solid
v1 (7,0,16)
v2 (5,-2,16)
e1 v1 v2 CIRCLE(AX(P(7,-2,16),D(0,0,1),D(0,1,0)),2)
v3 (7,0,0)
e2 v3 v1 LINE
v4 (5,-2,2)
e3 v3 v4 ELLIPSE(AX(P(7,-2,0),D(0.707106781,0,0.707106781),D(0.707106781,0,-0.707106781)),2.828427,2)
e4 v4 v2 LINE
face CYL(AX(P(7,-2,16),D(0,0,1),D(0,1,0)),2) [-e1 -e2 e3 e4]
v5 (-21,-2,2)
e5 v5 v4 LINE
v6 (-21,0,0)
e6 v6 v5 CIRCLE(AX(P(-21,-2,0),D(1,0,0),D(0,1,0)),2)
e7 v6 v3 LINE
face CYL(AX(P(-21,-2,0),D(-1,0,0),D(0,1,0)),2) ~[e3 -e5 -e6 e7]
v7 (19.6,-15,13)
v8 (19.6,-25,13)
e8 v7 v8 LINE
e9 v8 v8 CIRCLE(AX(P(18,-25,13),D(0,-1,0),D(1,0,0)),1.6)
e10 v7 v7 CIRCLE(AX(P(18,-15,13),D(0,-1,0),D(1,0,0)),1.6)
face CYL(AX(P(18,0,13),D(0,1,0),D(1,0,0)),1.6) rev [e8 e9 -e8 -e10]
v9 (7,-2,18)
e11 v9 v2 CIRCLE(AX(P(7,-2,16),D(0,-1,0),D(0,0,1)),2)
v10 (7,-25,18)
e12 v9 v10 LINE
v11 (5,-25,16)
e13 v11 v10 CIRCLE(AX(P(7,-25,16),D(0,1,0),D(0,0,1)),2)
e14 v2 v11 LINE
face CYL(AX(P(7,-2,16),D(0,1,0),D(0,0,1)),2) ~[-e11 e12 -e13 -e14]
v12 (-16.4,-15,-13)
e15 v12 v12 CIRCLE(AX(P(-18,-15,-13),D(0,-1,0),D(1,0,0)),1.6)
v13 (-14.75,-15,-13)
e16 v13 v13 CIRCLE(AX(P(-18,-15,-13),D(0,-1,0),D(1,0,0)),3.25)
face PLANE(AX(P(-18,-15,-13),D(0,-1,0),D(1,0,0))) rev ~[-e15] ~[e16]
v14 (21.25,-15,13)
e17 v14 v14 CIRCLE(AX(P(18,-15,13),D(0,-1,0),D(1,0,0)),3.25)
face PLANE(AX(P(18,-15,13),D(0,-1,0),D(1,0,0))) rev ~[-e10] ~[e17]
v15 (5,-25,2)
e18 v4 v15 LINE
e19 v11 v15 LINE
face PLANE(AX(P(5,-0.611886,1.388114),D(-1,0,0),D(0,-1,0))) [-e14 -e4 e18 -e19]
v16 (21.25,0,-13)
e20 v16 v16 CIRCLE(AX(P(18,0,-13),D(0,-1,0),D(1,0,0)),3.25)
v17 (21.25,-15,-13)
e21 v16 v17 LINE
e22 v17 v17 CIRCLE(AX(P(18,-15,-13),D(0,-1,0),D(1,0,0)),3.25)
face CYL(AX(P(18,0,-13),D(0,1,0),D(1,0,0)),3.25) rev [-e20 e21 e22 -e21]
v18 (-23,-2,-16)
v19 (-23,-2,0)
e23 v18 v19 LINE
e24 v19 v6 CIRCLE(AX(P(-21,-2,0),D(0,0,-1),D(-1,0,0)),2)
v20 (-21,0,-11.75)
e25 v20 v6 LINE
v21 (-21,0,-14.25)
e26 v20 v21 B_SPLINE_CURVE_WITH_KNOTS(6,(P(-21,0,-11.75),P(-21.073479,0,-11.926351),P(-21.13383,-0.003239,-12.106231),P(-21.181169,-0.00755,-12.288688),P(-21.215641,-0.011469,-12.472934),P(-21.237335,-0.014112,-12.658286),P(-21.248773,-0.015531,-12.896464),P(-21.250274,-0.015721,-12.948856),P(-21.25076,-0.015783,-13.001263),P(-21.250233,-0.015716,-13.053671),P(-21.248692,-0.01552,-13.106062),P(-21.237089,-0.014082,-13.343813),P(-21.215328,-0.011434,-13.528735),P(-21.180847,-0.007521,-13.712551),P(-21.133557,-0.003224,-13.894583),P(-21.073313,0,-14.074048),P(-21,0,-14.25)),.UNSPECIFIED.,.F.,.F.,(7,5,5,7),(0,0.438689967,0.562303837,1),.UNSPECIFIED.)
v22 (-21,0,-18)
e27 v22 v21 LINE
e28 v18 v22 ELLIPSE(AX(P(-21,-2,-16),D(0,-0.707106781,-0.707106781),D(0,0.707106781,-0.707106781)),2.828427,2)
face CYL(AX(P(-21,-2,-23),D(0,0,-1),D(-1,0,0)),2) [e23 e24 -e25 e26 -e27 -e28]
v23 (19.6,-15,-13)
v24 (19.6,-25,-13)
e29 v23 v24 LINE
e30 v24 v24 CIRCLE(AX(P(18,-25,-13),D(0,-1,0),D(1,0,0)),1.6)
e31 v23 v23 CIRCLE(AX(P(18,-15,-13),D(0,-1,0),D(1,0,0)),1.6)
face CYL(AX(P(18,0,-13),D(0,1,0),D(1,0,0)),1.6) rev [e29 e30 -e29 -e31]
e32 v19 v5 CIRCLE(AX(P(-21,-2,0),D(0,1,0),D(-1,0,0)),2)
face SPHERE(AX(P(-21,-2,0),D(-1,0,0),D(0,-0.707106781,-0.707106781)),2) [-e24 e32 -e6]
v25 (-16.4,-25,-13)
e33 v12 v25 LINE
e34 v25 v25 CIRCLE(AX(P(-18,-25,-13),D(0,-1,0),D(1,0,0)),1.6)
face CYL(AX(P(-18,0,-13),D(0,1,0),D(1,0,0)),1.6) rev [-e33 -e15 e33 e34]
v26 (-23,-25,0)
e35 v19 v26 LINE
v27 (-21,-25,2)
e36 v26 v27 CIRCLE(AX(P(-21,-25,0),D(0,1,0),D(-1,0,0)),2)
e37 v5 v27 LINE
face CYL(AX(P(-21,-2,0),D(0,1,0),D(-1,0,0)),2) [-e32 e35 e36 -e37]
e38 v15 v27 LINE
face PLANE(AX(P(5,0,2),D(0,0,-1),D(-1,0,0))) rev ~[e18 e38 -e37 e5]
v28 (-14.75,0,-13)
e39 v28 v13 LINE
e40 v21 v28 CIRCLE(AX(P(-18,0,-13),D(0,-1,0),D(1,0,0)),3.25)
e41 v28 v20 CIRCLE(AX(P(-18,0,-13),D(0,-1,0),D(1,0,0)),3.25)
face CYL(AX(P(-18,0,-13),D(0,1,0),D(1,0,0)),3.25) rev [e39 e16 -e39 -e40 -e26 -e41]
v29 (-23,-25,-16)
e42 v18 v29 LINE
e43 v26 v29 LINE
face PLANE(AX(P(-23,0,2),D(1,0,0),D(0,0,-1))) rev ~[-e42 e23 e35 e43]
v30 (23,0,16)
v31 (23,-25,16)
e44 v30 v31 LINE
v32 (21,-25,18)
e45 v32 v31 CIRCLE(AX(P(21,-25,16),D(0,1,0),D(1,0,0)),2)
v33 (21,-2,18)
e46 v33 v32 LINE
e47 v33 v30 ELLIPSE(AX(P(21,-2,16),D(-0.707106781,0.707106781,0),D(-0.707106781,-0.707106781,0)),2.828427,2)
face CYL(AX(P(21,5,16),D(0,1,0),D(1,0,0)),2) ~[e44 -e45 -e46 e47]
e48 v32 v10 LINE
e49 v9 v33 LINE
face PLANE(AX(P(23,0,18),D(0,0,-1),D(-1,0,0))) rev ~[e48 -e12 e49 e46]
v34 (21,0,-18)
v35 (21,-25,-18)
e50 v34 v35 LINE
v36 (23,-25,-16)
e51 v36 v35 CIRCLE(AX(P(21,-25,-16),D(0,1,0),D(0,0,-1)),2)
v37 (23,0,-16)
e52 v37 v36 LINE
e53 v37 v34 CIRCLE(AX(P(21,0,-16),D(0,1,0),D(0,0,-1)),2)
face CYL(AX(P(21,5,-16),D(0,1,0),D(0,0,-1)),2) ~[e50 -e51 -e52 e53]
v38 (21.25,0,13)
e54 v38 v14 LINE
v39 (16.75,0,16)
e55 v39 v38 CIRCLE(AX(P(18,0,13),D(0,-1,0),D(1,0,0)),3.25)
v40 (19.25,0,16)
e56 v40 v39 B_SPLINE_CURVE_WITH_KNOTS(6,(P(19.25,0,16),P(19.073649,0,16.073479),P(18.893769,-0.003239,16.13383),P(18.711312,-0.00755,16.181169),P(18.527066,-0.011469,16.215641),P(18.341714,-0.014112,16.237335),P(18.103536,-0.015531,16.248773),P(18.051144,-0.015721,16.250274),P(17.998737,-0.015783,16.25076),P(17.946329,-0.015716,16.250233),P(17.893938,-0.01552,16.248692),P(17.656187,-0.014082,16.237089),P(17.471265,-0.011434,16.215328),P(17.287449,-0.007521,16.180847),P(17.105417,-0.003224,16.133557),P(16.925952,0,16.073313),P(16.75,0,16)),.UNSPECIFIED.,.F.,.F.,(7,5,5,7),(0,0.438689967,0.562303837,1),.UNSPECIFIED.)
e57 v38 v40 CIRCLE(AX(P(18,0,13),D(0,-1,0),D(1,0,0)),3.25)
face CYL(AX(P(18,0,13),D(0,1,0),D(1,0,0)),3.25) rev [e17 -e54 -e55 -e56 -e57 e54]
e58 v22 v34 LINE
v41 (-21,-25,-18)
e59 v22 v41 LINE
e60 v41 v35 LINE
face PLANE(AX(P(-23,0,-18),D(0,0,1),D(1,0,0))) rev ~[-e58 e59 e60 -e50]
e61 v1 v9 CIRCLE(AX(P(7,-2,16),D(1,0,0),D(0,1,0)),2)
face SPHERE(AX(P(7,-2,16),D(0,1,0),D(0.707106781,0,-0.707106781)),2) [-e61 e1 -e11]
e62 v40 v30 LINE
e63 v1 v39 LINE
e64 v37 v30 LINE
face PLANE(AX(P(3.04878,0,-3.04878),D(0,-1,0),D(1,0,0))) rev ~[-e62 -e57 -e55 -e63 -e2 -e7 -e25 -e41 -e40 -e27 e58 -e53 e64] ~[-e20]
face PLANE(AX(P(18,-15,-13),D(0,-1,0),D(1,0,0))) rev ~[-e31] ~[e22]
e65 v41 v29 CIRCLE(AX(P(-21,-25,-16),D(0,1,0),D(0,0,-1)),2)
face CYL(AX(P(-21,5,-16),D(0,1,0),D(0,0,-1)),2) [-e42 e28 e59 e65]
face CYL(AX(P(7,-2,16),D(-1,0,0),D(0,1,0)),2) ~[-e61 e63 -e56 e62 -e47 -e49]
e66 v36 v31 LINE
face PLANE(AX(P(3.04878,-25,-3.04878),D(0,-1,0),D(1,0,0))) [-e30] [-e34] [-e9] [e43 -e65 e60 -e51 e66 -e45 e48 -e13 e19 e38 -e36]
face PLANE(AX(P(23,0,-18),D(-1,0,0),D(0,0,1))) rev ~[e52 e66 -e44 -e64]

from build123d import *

# Parameters (mm, degrees)
F0_R         = 3.25
F0_R_2       = 1.6
F0_W         = 26
F0_H         = 2
F1_DEPTH     = 25
F2_DEPTH     = 15
F3_T1_DEPTH  = 23
F3_T3_DEPTH  = 21
F3_T5_DEPTH  = 28
F3_T7_DEPTH  = 35
F3_T9_DEPTH  = 26
F3_T11_DEPTH = 14
F3_S15_W     = 2
F3_S15_H     = 2
F3_T16_DEPTH = 2
F3_S21_W     = 2
F3_S21_H     = 2
F3_T22_DEPTH = 2
F3_T29_DEPTH = 31
F3_T33_DEPTH = 19


# Not quite as in the source:
# - a fillet or chamfer that OpenCascade refuses, or shapes differently, is made with other operations: its cross-section is extruded or revolved along the edge and cut away or added


with BuildPart() as f1:
    # F0 (on Front) → F1 (new body)
    with BuildSketch(Plane.XZ):
        Polygon((-23, 0), (-23, -18), (23, -18), (23, 18), (5, 18), (5, 2), (3, 2), (3, 0), align=None)
        with Locations((-18, -13)):
            Circle(F0_R, mode=Mode.SUBTRACT)
        with Locations((18, -13)):
            Circle(F0_R, mode=Mode.SUBTRACT)
        with Locations((18, 13)):
            Circle(F0_R, mode=Mode.SUBTRACT)
        with Locations((18, 13)):
            Circle(F0_R)
        with Locations((18, 13)):
            Circle(F0_R_2, mode=Mode.SUBTRACT)
        with Locations((18, -13)):
            Circle(F0_R)
        with Locations((18, -13)):
            Circle(F0_R_2, mode=Mode.SUBTRACT)
        with Locations((-18, -13)):
            Circle(F0_R)
        with Locations((-18, -13)):
            Circle(F0_R_2, mode=Mode.SUBTRACT)
        with Locations((-10, 1)):
            Rectangle(F0_W, F0_H)
    extrude(amount=F1_DEPTH)

    # F0 (on Front) → F2 (cut)
    with BuildSketch(Plane.XZ):
        with Locations((18, -13)):
            Circle(F0_R)
        with Locations((18, -13)):
            Circle(F0_R_2, mode=Mode.SUBTRACT)
        with Locations((-18, -13)):
            Circle(F0_R)
        with Locations((-18, -13)):
            Circle(F0_R_2, mode=Mode.SUBTRACT)
        with Locations((18, 13)):
            Circle(F0_R)
        with Locations((18, 13)):
            Circle(F0_R_2, mode=Mode.SUBTRACT)
    extrude(amount=F2_DEPTH, mode=Mode.SUBTRACT)

    # F3: fillet of radius 2 on 9 edges, made by hand

    # F3_s2 → F3_t1 (cut)
    with BuildSketch(Plane.XY.offset(-23)):
        with BuildLine():
            ThreePointArc((-23, -2), (-22.4142135624, -0.5857864376), (-21, 0))
            Line((-21, 0), (-23, 0))
            Line((-23, 0), (-23, -2))
        make_face()
    extrude(amount=F3_T1_DEPTH, mode=Mode.SUBTRACT)

    # F3_s4 → F3_t3 (cut)
    with BuildSketch(Plane.YZ.offset(7)):
        with BuildLine():
            ThreePointArc((0, 16), (-0.5857864376, 17.4142135624), (-2, 18))
            Line((-2, 18), (0, 18))
            Line((0, 18), (0, 16))
        make_face()
    extrude(amount=F3_T3_DEPTH, mode=Mode.SUBTRACT)

    # F3_s6 → F3_t5 (cut)
    with BuildSketch(Plane.XZ.offset(2)):
        with BuildLine():
            ThreePointArc((-23, 0), (-22.4142135624, 1.4142135624), (-21, 2))
            Line((-21, 2), (-23, 2))
            Line((-23, 2), (-23, 0))
        make_face()
        with BuildLine():
            ThreePointArc((7, 18), (5.5857864376, 17.4142135624), (5, 16))
            Line((5, 16), (5, 18))
            Line((5, 18), (7, 18))
        make_face()
    extrude(amount=F3_T5_DEPTH, mode=Mode.SUBTRACT)

    # F3_s8 → F3_t7 (cut)
    with BuildSketch(Plane.XZ.offset(-5)):
        with BuildLine():
            ThreePointArc((-21, -18), (-22.4142135624, -17.4142135624), (-23, -16))
            Line((-23, -16), (-23, -18))
            Line((-23, -18), (-21, -18))
        make_face()
        with BuildLine():
            ThreePointArc((21, -18), (22.4142135624, -17.4142135624), (23, -16))
            Line((23, -16), (23, -18))
            Line((23, -18), (21, -18))
        make_face()
        with BuildLine():
            ThreePointArc((23, 16), (22.4142135624, 17.4142135624), (21, 18))
            Line((21, 18), (23, 18))
            Line((23, 18), (23, 16))
        make_face()
    extrude(amount=F3_T7_DEPTH, mode=Mode.SUBTRACT)

    # F3_s10 → F3_t9 (cut)
    with BuildSketch(Plane.YZ.offset(-21)):
        with BuildLine():
            ThreePointArc((0, 0), (-0.5857864376, 1.4142135624), (-2, 2))
            Line((-2, 2), (0, 2))
            Line((0, 2), (0, 0))
        make_face()
    extrude(amount=F3_T9_DEPTH, mode=Mode.SUBTRACT)

    # F3_s12 → F3_t11 (cut)
    with BuildSketch(Plane.XY.offset(2)):
        with BuildLine():
            ThreePointArc((7, 0), (5.5857864376, -0.5857864376), (5, -2))
            Line((5, -2), (5, 0))
            Line((5, 0), (7, 0))
        make_face()
    extrude(amount=F3_T11_DEPTH, mode=Mode.SUBTRACT)


with BuildPart() as f3_tool14:
    # F3_s15 → F3_t16 (new body)
    with BuildSketch(Plane.YZ.offset(-21)):
        with Locations((-1, 1)):
            Rectangle(F3_S15_W, F3_S15_H)
    extrude(amount=-F3_T16_DEPTH)

    # F3_s17 → F3_t18 (revolve, cut)
    with BuildSketch(Plane(origin=(-21, -2, 0), x_dir=(0, -0.7071067812, -0.7071067812), z_dir=(0, 0.7071067812, -0.7071067812))):
        with BuildLine():
            ThreePointArc((0, -2), (2, 0), (0, 2))
            Line((0, 2), (0, -2))
        make_face()
    revolve(axis=Axis((-21, -2, 0), (-1, 0, 0)), mode=Mode.SUBTRACT)


with BuildPart() as f1_1:
    add(f1.part)

    # F3_t13: cut F3_tool14
    add(f3_tool14.part, mode=Mode.SUBTRACT)


with BuildPart() as f3_tool20:
    # F3_s21 → F3_t22 (new body)
    with BuildSketch(Plane.XZ.offset(2)):
        with Locations((6, 17)):
            Rectangle(F3_S21_W, F3_S21_H)
    extrude(amount=-F3_T22_DEPTH)

    # F3_s23 → F3_t24 (revolve, cut)
    with BuildSketch(Plane(origin=(7, -2, 16), x_dir=(0.7071067812, 0, -0.7071067812), z_dir=(0.7071067812, 0, 0.7071067812))):
        with BuildLine():
            ThreePointArc((0, -2), (2, 0), (0, 2))
            Line((0, 2), (0, -2))
        make_face()
    revolve(axis=Axis((7, -2, 16), (0, 1, 0)), mode=Mode.SUBTRACT)


with BuildPart() as f1_2:
    add(f1_1.part)

    # F3_t19: cut F3_tool20
    add(f3_tool20.part, mode=Mode.SUBTRACT)


with BuildPart() as f3_tool27:
    # F3_s28 → F3_t29 (new body)
    with BuildSketch(Plane.YZ.offset(10)):
        with BuildLine():
            ThreePointArc((0, 0), (-0.5857864376, 1.4142135624), (-2, 2))
            Line((-2, 2), (0, 2))
            Line((0, 2), (0, 0))
        make_face()
    extrude(amount=-F3_T29_DEPTH)

    split(bisect_by=Plane.YZ.offset(5), keep=Keep.TOP)


with BuildPart() as f3_tool31:
    # F3_s32 → F3_t33 (new body)
    with BuildSketch(Plane.XY.offset(16)):
        with BuildLine():
            ThreePointArc((7, 0), (5.5857864376, -0.5857864376), (5, -2))
            Line((5, -2), (5, 0))
            Line((5, 0), (7, 0))
        make_face()
    extrude(amount=-F3_T33_DEPTH)

    split(bisect_by=Plane.XY.offset(2), keep=Keep.BOTTOM)


with BuildPart() as f3_tool27_1:
    add(f3_tool27.part)

    # F3_t35: intersect F3_tool31
    add(f3_tool31.part, mode=Mode.INTERSECT)


with BuildPart() as f1_3:
    add(f1_2.part)

    # F3_t25: cut F3_tool27
    add(f3_tool27_1.part, mode=Mode.SUBTRACT)


solid = f1_3.part
